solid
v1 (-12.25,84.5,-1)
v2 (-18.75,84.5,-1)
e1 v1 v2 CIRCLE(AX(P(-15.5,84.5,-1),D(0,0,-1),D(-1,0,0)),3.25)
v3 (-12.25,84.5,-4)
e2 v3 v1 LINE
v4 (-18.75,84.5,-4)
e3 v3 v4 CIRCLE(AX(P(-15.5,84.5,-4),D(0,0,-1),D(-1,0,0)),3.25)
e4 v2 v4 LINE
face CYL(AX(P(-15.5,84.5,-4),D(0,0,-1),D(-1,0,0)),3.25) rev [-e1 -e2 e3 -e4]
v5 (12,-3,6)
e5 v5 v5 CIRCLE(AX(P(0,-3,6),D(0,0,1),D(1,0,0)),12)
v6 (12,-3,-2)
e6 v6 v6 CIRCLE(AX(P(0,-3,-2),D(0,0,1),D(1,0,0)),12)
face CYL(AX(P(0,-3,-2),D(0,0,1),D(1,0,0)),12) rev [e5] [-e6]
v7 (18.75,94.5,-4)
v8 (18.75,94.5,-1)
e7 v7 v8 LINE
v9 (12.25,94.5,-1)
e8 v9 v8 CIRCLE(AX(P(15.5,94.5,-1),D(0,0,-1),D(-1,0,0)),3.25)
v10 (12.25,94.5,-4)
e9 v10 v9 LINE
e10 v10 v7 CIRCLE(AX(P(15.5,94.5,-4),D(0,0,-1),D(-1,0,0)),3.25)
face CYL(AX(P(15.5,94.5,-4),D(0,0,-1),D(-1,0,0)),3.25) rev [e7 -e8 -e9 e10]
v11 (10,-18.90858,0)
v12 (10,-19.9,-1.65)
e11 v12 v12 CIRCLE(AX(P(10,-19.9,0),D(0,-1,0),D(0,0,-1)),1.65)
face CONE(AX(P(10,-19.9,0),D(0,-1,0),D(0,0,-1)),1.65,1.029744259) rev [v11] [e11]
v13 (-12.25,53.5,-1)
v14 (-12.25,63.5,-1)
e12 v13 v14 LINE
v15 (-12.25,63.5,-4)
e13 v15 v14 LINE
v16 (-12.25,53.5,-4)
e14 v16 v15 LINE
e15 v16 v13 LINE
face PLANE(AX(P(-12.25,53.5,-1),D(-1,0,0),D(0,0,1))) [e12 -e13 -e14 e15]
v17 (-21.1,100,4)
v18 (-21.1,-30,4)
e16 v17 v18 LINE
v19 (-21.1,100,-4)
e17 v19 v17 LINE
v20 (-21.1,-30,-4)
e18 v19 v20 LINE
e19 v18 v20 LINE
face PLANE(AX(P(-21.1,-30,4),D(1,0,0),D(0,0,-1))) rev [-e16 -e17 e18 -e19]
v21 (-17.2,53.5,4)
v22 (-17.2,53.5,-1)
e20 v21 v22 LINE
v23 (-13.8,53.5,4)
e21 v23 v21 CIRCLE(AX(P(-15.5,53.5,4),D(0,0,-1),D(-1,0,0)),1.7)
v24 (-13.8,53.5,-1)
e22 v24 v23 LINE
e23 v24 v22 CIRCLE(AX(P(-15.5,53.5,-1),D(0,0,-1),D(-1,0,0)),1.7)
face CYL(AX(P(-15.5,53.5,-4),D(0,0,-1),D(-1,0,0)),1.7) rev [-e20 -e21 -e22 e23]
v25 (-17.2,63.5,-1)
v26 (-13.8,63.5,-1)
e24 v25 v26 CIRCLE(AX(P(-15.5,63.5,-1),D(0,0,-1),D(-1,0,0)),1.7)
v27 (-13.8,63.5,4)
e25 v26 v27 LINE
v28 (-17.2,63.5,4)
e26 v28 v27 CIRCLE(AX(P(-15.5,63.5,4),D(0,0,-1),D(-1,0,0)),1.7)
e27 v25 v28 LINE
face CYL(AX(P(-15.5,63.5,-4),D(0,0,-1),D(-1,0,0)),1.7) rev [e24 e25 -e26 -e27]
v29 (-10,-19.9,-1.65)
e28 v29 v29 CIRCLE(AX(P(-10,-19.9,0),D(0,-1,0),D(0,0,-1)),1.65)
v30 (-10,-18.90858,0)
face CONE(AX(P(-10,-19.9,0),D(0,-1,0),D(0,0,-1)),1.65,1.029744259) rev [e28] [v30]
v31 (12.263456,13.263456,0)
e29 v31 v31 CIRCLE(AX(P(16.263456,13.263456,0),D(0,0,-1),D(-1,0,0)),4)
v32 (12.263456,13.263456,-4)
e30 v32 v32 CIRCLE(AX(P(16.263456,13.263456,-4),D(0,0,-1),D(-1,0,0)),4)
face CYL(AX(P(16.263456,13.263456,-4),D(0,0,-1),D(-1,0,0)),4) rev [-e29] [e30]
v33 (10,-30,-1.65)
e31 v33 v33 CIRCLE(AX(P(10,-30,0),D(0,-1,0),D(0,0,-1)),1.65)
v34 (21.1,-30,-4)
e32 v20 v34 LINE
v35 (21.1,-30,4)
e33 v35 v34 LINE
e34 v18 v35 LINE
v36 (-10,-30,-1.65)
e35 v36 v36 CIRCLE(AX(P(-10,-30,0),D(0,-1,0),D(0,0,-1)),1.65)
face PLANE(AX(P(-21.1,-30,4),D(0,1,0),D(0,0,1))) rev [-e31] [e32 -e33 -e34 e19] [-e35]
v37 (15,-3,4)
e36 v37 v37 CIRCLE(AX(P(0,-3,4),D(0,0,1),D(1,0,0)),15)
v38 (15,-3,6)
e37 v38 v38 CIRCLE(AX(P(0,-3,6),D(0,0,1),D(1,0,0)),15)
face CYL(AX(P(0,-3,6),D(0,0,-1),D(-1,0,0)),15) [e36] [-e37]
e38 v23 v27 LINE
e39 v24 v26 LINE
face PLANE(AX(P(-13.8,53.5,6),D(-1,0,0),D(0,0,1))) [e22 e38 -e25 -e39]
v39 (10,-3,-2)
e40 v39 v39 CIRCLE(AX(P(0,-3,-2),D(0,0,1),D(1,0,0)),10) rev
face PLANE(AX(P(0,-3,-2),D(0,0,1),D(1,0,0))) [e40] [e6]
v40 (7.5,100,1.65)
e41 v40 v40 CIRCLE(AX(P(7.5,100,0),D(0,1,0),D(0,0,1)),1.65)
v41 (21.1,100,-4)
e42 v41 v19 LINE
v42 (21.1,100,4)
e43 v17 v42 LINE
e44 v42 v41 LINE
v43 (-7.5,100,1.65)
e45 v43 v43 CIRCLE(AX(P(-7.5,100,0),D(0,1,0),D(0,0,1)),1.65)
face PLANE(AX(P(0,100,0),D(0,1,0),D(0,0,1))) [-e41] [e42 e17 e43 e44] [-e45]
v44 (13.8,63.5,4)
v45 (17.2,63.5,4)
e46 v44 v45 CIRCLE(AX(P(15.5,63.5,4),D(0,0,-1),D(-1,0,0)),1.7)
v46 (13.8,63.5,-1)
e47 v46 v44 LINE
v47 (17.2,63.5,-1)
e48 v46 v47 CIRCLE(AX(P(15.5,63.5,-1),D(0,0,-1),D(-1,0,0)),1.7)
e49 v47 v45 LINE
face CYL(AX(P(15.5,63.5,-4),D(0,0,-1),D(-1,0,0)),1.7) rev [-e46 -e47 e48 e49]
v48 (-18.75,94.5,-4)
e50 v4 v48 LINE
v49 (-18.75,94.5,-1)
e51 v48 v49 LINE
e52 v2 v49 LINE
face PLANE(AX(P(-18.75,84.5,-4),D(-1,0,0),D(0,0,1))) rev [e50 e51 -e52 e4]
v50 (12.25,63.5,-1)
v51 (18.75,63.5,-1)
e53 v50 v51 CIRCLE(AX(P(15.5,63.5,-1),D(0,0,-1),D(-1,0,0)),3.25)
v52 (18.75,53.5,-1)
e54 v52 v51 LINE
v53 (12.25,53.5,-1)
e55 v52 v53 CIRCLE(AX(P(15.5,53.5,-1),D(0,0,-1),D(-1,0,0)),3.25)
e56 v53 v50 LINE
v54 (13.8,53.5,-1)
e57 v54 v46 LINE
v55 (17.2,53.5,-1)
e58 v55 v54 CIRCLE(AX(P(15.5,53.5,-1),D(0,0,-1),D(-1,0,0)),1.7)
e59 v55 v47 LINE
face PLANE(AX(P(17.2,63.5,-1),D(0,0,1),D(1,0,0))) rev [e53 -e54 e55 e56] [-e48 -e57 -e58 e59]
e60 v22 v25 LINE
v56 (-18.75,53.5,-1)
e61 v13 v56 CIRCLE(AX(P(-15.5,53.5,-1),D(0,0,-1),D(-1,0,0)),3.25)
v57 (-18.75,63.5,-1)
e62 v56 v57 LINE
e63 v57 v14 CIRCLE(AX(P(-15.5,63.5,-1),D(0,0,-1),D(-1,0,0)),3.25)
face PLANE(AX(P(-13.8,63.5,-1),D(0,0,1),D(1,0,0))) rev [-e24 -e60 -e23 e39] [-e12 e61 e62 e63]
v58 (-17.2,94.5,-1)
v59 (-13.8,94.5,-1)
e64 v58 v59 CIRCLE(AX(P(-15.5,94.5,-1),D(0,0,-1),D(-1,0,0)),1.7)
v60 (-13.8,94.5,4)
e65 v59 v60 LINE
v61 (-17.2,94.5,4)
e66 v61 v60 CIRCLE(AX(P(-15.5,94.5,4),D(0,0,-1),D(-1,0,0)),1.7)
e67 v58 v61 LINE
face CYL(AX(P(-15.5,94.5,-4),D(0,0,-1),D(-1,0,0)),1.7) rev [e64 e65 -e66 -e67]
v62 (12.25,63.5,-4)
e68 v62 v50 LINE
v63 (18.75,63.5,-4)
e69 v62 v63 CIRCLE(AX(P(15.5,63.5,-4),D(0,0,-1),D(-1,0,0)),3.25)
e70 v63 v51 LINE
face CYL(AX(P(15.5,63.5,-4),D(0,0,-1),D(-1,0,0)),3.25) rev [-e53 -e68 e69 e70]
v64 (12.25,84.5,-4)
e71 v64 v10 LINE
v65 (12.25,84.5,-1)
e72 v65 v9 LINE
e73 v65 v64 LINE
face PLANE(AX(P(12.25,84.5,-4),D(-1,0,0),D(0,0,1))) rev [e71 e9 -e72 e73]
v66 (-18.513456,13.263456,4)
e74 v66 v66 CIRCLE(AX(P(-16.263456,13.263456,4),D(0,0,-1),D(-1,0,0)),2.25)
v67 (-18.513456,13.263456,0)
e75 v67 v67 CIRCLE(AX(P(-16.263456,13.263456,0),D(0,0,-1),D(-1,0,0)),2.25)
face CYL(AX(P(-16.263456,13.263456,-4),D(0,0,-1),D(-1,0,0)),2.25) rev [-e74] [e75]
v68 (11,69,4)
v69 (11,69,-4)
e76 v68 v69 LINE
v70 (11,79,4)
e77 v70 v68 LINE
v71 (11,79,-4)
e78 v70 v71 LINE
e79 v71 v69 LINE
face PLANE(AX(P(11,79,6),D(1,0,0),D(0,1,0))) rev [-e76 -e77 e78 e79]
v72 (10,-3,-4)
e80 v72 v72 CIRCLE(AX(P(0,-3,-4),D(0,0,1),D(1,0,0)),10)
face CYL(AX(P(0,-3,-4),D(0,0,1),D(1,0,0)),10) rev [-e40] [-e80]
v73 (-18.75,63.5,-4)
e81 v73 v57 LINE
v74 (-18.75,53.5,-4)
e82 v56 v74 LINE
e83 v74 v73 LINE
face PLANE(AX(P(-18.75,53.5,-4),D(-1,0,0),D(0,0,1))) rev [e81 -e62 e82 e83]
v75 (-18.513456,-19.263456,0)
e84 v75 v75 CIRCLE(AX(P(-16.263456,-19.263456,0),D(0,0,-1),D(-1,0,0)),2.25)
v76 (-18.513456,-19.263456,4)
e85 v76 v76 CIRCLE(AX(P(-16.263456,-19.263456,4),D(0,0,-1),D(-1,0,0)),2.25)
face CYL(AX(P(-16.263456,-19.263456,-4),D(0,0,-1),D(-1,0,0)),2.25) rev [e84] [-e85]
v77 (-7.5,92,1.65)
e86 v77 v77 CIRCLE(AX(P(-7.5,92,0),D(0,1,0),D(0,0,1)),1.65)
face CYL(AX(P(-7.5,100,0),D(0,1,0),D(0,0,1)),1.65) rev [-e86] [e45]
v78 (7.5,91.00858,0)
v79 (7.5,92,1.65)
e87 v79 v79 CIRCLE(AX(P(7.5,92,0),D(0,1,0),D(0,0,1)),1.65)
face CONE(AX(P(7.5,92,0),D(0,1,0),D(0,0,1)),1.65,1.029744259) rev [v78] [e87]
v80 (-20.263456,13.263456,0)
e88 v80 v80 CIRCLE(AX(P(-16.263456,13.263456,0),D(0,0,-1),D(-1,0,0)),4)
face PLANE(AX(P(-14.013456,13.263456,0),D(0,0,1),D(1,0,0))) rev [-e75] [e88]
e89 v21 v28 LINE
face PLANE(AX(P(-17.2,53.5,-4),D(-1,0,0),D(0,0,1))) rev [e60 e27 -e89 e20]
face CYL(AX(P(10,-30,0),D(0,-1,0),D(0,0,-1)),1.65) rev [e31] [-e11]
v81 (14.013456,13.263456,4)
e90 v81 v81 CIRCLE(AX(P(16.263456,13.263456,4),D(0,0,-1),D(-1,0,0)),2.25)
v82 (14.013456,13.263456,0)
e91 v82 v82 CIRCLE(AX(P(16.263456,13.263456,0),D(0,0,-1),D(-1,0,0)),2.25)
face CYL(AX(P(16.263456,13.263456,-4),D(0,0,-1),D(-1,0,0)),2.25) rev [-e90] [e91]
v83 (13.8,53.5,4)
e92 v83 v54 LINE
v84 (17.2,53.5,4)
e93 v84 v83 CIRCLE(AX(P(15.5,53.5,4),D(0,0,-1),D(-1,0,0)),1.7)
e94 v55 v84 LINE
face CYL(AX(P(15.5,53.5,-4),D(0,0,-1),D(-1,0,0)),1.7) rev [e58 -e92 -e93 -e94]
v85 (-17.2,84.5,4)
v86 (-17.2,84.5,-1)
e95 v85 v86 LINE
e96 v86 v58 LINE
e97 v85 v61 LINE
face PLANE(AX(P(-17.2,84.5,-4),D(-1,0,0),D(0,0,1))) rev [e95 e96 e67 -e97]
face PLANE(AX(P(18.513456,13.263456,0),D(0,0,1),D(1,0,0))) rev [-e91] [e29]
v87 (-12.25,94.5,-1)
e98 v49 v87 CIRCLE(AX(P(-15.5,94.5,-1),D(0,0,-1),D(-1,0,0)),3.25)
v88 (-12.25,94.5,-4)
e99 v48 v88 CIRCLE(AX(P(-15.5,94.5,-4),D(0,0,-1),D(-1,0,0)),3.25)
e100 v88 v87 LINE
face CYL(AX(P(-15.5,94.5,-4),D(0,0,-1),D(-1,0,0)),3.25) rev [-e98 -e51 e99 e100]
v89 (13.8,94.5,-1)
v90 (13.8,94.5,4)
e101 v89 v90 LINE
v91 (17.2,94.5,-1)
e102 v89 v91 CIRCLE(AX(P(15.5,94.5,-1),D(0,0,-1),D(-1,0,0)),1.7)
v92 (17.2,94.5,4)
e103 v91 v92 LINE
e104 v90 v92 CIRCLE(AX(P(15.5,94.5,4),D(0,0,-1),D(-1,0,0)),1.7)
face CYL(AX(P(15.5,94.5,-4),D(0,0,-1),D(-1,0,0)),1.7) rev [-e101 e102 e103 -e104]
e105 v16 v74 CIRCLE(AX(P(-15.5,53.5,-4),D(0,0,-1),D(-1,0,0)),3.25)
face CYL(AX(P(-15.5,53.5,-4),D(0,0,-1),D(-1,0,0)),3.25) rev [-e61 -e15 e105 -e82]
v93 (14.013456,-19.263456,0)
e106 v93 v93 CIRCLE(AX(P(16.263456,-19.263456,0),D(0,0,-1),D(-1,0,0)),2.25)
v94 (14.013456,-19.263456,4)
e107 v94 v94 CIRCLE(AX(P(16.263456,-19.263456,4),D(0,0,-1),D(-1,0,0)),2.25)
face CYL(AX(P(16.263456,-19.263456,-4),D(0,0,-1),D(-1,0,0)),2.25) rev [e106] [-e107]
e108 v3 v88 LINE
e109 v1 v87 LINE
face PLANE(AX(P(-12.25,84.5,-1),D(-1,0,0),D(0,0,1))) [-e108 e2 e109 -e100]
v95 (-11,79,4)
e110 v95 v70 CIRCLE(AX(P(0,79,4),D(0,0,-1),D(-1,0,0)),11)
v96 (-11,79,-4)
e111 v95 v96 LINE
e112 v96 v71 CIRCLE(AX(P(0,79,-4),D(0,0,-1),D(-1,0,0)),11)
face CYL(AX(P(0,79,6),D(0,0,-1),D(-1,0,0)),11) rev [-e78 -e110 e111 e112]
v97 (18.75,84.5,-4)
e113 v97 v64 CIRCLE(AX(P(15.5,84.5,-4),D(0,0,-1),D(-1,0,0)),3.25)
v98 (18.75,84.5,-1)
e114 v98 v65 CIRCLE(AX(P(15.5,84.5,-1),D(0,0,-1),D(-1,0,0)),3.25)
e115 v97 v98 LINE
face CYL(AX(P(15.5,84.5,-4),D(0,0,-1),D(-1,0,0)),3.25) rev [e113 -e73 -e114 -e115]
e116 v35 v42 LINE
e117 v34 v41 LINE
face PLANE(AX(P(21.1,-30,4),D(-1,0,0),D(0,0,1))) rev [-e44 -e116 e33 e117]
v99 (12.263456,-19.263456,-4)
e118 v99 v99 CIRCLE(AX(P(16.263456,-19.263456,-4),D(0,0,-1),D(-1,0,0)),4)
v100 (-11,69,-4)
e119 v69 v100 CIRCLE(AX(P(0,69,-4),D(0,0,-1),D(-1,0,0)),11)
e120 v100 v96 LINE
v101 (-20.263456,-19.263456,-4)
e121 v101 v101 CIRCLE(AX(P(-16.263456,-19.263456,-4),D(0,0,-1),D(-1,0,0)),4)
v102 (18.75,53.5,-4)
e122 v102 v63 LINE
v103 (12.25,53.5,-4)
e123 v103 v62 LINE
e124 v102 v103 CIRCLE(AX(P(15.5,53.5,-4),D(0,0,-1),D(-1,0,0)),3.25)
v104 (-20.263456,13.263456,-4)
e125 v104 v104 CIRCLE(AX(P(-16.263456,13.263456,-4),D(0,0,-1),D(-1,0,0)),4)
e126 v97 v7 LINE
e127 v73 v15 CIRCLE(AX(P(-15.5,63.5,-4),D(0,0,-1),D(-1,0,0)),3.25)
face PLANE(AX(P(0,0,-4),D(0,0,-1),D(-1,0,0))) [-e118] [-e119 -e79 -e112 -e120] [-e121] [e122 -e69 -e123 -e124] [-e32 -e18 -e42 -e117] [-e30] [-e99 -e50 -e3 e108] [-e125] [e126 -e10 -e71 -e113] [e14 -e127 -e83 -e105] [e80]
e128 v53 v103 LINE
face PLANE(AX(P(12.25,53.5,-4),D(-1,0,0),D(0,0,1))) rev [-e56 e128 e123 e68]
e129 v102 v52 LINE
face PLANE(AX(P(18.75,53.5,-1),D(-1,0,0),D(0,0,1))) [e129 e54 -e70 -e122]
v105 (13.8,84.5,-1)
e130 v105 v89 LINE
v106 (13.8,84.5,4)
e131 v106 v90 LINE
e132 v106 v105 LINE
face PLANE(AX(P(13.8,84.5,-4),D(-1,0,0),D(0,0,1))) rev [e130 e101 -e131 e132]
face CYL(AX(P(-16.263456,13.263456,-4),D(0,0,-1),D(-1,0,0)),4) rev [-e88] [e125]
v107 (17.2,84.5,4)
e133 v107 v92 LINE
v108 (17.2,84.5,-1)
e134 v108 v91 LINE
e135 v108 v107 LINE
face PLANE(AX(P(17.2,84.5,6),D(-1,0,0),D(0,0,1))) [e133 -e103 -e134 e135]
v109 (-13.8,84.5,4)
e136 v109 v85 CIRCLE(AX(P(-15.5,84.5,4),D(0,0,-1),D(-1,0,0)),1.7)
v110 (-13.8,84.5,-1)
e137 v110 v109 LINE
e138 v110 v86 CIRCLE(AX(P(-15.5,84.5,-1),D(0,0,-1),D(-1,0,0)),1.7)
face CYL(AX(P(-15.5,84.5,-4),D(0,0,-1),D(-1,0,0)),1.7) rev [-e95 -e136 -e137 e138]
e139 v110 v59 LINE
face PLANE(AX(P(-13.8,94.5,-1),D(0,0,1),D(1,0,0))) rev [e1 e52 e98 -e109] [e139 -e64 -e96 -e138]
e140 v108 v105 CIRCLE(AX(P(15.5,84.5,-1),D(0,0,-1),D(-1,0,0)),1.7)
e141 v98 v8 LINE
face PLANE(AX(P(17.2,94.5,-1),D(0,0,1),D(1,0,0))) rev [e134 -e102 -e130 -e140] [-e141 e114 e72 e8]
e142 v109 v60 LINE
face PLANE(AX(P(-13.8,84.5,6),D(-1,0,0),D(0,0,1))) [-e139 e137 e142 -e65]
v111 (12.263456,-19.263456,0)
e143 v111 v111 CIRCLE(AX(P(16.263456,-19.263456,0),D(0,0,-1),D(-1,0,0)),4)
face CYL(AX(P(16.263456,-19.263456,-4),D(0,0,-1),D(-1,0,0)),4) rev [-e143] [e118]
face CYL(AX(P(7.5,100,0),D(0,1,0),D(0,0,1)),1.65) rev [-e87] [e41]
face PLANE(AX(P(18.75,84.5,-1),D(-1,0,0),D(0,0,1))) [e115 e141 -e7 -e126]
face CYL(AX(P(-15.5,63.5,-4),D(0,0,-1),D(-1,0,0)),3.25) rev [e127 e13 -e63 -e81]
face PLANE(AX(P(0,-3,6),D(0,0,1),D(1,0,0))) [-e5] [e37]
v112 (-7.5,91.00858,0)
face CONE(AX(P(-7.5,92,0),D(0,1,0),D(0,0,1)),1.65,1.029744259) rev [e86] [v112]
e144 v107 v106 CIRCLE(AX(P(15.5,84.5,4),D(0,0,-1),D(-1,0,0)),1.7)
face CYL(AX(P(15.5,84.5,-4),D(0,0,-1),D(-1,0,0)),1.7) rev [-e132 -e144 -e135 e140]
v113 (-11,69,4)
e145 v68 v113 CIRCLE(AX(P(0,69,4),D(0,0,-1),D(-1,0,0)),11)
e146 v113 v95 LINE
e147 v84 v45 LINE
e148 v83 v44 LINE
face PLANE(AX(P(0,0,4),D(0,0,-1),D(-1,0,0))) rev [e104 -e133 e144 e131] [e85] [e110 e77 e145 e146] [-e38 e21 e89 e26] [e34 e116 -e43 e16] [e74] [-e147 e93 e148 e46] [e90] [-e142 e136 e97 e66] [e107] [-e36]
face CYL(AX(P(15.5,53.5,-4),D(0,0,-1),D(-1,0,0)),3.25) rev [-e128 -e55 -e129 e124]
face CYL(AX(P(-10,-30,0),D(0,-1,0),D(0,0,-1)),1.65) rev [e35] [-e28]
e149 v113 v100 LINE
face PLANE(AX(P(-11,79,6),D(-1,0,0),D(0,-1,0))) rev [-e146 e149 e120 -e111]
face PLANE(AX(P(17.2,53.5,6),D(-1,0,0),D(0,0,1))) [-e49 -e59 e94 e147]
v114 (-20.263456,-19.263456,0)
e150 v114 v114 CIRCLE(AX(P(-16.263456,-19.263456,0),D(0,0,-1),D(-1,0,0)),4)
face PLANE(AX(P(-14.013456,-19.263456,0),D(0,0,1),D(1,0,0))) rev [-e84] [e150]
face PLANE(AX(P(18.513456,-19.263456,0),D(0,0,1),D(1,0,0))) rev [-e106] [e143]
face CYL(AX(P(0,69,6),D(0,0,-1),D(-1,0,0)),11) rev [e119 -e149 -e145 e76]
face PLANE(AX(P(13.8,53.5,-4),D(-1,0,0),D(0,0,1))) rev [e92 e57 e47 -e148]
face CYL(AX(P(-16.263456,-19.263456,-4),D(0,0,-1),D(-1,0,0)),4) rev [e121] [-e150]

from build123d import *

# Parameters (mm, degrees)
SKETCH_1_W                   = 42.2
SKETCH_1_H                   = 60
EXTRUDE_1_DEPTH              = 4
SKETCH_5_R                   = 15
EXTRUDE_3_DEPTH              = 2
SKETCH_6_R                   = 10
CUT_EXTRUDE_3_DEPTH          = 39.015917719
SKETCH_7_R                   = 12
CUT_EXTRUDE_4_DEPTH          = 8
SKETCH_8_W                   = 42.2
SKETCH_8_H                   = 8
EXTRUDE_4_DEPTH              = 70
CUT_EXTRUDE_5_DEPTH          = 103.689872918
HOLE_START                   = -4
HOLE_WIZARD_M3_7_DEPTH       = 8
HOLE_WIZARD_M3_7_2_DEPTH     = 3
HOLE_WIZARD_M4_1_D           = 4.5
HOLE_WIZARD_M4_1_CBORE_D     = 8
HOLE_WIZARD_M4_1_CBORE_DEPTH = 4
M4X0_7_1_D                   = 3.3
M4X0_7_1_DEPTH               = 10.1
M4X0_7_1_TIP                 = 0.991420021
M4X0_7_2_D                   = 3.3
M4X0_7_2_DEPTH               = 8
M4X0_7_2_TIP                 = 0.991420021


# Read off the part's stored shape, not the designer's step: M3 凹頭蓋螺釘的柱孔7
with BuildPart() as part:
    # 草圖1 → 填料-伸長1 (new, symmetric)
    with BuildSketch(Plane.XY):
        Rectangle(SKETCH_1_W, SKETCH_1_H)
    extrude(amount=EXTRUDE_1_DEPTH, both=True)

    # 草圖5 → 填料-伸長3 (add)
    with BuildSketch(Plane.XY.offset(4)):
        with Locations((0, -3)):
            Circle(SKETCH_5_R)
    extrude(amount=EXTRUDE_3_DEPTH)

    # 草圖6 → 除料-伸長3 (cut, through all)
    with BuildSketch(Plane.XY.offset(6)):
        with Locations((0, -3)):
            Circle(SKETCH_6_R)
    extrude(amount=-CUT_EXTRUDE_3_DEPTH, mode=Mode.SUBTRACT)

    # 草圖7 → 除料-伸長4 (cut)
    with BuildSketch(Plane.XY.offset(6)):
        with Locations((0, -3)):
            Circle(SKETCH_7_R)
    extrude(amount=-CUT_EXTRUDE_4_DEPTH, mode=Mode.SUBTRACT)

    # 草圖8 → 填料-伸長4 (add)
    with BuildSketch(Plane(origin=(0, 30, 0), x_dir=(1, 0, 0), z_dir=(0, 1, 0))):
        Rectangle(SKETCH_8_W, SKETCH_8_H)
    extrude(amount=EXTRUDE_4_DEPTH)

    # 草圖9 → 除料-伸長5 (cut, through all)
    with BuildSketch(Plane(origin=(0, 0, -4), x_dir=(-1, 0, 0), z_dir=(0, 0, -1))):
        with BuildLine():
            Line((11, 79), (11, 69))
            ThreePointArc((11, 69), (0, 58), (-11, 69))
            Line((-11, 69), (-11, 79))
            ThreePointArc((-11, 79), (0, 90), (11, 79))
        make_face()
    extrude(amount=-CUT_EXTRUDE_5_DEPTH, mode=Mode.SUBTRACT)

    # M3 凹頭蓋螺釘的柱孔7 outline → M3 凹頭蓋螺釘的柱孔7 (cut)
    with BuildSketch(Plane.XY.offset(HOLE_START)):
        with BuildLine():
            Line((-13.8, 53.5), (-13.8, 63.5))
            ThreePointArc((-13.8, 63.5), (-15.5, 65.2), (-17.2, 63.5))
            Line((-17.2, 63.5), (-17.2, 53.5))
            ThreePointArc((-17.2, 53.5), (-15.5, 51.8), (-13.8, 53.5))
        make_face()
        with BuildLine():
            Line((-13.8, 84.5), (-13.8, 94.5))
            ThreePointArc((-13.8, 94.5), (-15.5, 96.2), (-17.2, 94.5))
            Line((-17.2, 94.5), (-17.2, 84.5))
            ThreePointArc((-17.2, 84.5), (-15.5, 82.8), (-13.8, 84.5))
        make_face()
        with BuildLine():
            ThreePointArc((17.2, 63.5), (15.5, 65.2), (13.8, 63.5))
            Line((13.8, 63.5), (13.8, 53.5))
            ThreePointArc((13.8, 53.5), (15.5, 51.8), (17.2, 53.5))
            Line((17.2, 53.5), (17.2, 63.5))
        make_face()
        with BuildLine():
            ThreePointArc((17.2, 94.5), (15.5, 96.2), (13.8, 94.5))
            Line((13.8, 94.5), (13.8, 84.5))
            ThreePointArc((13.8, 84.5), (15.5, 82.8), (17.2, 84.5))
            Line((17.2, 84.5), (17.2, 94.5))
        make_face()
    extrude(amount=HOLE_WIZARD_M3_7_DEPTH, mode=Mode.SUBTRACT)

    # Hole Wizard M3 _7 2 outline → Hole Wizard M3 _7 2 (cut)
    # profile 1 of 4: a face of its own
    with BuildSketch(Plane.XY.offset(HOLE_START)):
        with BuildLine():
            ThreePointArc((-12.25, 63.5), (-15.5, 66.75), (-18.75, 63.5))
            Line((-18.75, 63.5), (-18.75, 53.5))
            ThreePointArc((-18.75, 53.5), (-15.5, 50.25), (-12.25, 53.5))
            Line((-12.25, 53.5), (-12.25, 63.5))
        make_face()
        with BuildLine():
            ThreePointArc((-17.2, 63.5), (-15.5, 65.2), (-13.8, 63.5))
            Line((-13.8, 63.5), (-13.8, 53.5))
            ThreePointArc((-13.8, 53.5), (-15.5, 51.8), (-17.2, 53.5))
            Line((-17.2, 53.5), (-17.2, 63.5))
        make_face(mode=Mode.SUBTRACT)
    # profile 2 of 4: a face of its own
    with BuildSketch(Plane.XY.offset(HOLE_START)):
        with BuildLine():
            Line((-12.25, 84.5), (-12.25, 94.5))
            ThreePointArc((-12.25, 94.5), (-15.5, 97.75), (-18.75, 94.5))
            Line((-18.75, 94.5), (-18.75, 84.5))
            ThreePointArc((-18.75, 84.5), (-15.5, 81.25), (-12.25, 84.5))
        make_face()
        with BuildLine():
            ThreePointArc((-17.2, 94.5), (-15.5, 96.2), (-13.8, 94.5))
            Line((-13.8, 94.5), (-13.8, 84.5))
            ThreePointArc((-13.8, 84.5), (-15.5, 82.8), (-17.2, 84.5))
            Line((-17.2, 84.5), (-17.2, 94.5))
        make_face(mode=Mode.SUBTRACT)
    # profile 3 of 4: a face of its own
    with BuildSketch(Plane.XY.offset(HOLE_START)):
        with BuildLine():
            ThreePointArc((18.75, 63.5), (15.5, 66.75), (12.25, 63.5))
            Line((12.25, 63.5), (12.25, 53.5))
            ThreePointArc((12.25, 53.5), (15.5, 50.25), (18.75, 53.5))
            Line((18.75, 53.5), (18.75, 63.5))
        make_face()
        with BuildLine():
            Line((13.8, 53.5), (13.8, 63.5))
            ThreePointArc((13.8, 63.5), (15.5, 65.2), (17.2, 63.5))
            Line((17.2, 63.5), (17.2, 53.5))
            ThreePointArc((17.2, 53.5), (15.5, 51.8), (13.8, 53.5))
        make_face(mode=Mode.SUBTRACT)
    # profile 4 of 4: a face of its own
    with BuildSketch(Plane.XY.offset(HOLE_START)):
        with BuildLine():
            Line((18.75, 84.5), (18.75, 94.5))
            ThreePointArc((18.75, 94.5), (15.5, 97.75), (12.25, 94.5))
            Line((12.25, 94.5), (12.25, 84.5))
            ThreePointArc((12.25, 84.5), (15.5, 81.25), (18.75, 84.5))
        make_face()
        with BuildLine():
            Line((13.8, 84.5), (13.8, 94.5))
            ThreePointArc((13.8, 94.5), (15.5, 96.2), (17.2, 94.5))
            Line((17.2, 94.5), (17.2, 84.5))
            ThreePointArc((17.2, 84.5), (15.5, 82.8), (13.8, 84.5))
        make_face(mode=Mode.SUBTRACT)
    extrude(amount=HOLE_WIZARD_M3_7_2_DEPTH, mode=Mode.SUBTRACT)

    # M4 凹頭蓋螺釘的柱孔1 (through all)
    with Locations(Plane(origin=(0, 0, -4), x_dir=(-1, 0, 0), z_dir=(0, 0, -1))):
        with Locations((16.263455967, 13.263455967), (-16.263455967, -19.263455967), (-16.263455967, 13.263455967), (16.263455967, -19.263455967)):
            CounterBoreHole(HOLE_WIZARD_M4_1_D / 2, HOLE_WIZARD_M4_1_CBORE_D / 2, HOLE_WIZARD_M4_1_CBORE_DEPTH)

    # M4x0.7 螺紋孔1
    with Locations(Plane(origin=(0, -30, 0), x_dir=(-1, 0, 0), z_dir=(0, -1, 0))):
        with Locations((10, 0), (-10, 0)):
            Hole(M4X0_7_1_D / 2, depth=M4X0_7_1_DEPTH)
            with Locations((0, 0, -(M4X0_7_1_DEPTH + M4X0_7_1_TIP / 2))):  # 118° drill point
                Cone(0, M4X0_7_1_D / 2, M4X0_7_1_TIP, mode=Mode.SUBTRACT)

    # M4x0.7 螺紋孔2
    with Locations(Plane(origin=(0, 100, 0), x_dir=(1, 0, 0), z_dir=(0, 1, 0))):
        with Locations((-7.5, 0), (7.5, 0)):
            Hole(M4X0_7_2_D / 2, depth=M4X0_7_2_DEPTH)
            with Locations((0, 0, -(M4X0_7_2_DEPTH + M4X0_7_2_TIP / 2))):  # 118° drill point
                Cone(0, M4X0_7_2_D / 2, M4X0_7_2_TIP, mode=Mode.SUBTRACT)


solid = part.part
